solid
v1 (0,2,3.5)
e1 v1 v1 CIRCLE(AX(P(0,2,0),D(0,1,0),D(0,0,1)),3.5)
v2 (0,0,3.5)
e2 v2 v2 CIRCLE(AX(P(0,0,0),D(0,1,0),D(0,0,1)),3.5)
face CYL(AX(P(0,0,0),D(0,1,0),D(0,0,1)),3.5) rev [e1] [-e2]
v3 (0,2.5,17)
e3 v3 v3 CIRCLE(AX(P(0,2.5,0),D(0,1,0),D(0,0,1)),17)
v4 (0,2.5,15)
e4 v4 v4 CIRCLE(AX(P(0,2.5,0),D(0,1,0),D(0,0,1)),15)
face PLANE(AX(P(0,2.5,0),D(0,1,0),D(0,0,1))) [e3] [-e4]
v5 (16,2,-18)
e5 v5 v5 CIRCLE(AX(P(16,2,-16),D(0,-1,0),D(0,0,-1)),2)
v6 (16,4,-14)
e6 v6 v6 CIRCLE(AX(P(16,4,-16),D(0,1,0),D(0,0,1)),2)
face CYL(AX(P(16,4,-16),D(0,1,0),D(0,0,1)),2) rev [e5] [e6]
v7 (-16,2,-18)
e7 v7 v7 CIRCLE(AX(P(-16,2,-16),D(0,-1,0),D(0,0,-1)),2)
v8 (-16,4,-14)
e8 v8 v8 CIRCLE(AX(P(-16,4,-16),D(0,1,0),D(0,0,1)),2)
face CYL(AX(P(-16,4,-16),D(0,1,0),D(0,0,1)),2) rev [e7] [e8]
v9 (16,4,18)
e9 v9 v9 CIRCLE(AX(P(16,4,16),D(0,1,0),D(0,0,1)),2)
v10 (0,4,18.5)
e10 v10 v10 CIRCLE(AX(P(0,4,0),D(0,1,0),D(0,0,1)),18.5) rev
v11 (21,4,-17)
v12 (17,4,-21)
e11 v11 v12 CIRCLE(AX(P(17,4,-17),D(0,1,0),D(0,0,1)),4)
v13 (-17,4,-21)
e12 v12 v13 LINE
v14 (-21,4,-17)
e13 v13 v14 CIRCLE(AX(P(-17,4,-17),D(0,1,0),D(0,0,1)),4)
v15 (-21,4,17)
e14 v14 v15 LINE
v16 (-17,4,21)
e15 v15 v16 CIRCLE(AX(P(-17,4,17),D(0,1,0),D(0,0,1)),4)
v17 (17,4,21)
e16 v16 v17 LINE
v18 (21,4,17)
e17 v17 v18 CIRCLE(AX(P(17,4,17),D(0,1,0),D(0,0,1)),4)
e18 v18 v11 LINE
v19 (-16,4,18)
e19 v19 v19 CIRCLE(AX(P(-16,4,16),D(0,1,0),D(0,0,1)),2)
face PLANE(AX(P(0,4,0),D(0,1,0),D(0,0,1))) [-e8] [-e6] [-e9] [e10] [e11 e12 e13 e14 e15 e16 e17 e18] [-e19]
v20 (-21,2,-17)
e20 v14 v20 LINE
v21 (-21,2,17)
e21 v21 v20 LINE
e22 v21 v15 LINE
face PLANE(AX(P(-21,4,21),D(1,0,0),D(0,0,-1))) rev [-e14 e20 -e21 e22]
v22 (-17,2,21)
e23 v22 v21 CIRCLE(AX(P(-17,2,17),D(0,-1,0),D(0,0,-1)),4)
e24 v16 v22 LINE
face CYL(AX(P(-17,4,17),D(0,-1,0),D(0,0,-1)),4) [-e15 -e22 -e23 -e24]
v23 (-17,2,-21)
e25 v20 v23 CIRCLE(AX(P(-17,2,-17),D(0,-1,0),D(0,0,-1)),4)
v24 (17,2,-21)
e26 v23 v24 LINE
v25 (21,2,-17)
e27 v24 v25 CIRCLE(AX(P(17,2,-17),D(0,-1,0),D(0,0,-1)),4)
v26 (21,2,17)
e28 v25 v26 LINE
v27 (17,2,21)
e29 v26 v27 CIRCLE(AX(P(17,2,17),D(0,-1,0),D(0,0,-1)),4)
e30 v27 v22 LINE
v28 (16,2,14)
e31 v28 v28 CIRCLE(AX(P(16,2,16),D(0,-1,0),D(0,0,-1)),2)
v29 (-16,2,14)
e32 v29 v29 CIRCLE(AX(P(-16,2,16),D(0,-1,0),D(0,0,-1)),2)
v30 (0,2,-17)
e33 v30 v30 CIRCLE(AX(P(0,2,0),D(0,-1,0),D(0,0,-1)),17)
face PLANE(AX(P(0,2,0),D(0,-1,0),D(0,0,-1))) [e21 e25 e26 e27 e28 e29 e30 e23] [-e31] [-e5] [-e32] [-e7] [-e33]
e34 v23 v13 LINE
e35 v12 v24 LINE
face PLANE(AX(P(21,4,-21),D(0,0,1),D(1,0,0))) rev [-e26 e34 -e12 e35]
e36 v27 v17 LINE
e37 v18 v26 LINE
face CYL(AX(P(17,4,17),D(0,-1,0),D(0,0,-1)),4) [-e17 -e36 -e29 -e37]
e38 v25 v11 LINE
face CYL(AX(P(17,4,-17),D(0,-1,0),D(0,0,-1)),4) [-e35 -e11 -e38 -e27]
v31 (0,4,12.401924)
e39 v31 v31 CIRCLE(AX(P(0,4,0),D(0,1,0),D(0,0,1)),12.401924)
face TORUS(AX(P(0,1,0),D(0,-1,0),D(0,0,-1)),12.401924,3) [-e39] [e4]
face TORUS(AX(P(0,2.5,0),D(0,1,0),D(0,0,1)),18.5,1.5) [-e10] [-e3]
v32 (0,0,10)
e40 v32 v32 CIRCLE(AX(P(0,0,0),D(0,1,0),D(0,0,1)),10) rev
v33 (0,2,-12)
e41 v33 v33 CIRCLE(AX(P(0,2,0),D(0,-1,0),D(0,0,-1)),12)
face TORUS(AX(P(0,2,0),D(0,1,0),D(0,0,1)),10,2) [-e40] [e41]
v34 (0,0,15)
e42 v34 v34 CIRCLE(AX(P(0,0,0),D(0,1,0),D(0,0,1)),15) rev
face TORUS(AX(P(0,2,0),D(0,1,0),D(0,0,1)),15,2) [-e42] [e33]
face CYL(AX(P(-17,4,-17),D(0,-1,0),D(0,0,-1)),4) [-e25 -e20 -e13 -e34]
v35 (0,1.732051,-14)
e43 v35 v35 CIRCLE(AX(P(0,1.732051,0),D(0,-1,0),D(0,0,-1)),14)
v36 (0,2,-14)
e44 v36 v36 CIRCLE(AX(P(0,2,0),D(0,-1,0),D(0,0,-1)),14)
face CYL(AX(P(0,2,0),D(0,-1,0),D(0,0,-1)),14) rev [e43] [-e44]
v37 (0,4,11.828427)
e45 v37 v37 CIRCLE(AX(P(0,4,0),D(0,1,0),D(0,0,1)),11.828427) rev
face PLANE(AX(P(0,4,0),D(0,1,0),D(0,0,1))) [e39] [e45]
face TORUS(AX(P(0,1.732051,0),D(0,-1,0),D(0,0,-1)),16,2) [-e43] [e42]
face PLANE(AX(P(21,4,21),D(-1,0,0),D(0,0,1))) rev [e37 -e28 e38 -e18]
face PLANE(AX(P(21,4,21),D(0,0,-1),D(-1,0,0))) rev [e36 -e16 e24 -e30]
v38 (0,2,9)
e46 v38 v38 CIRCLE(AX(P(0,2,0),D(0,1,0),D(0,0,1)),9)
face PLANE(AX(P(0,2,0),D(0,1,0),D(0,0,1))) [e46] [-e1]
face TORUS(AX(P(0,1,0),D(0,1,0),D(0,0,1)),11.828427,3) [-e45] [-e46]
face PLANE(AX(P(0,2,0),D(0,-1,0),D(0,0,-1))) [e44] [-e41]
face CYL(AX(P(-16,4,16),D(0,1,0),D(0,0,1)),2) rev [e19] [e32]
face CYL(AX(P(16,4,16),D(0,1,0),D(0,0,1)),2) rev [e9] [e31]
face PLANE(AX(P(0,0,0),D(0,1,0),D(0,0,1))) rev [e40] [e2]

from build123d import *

# Parameters (mm, degrees)
ESBO_O9_W                  = 42
ESBO_O9_H                  = 42
RESSALTO_EXTRUS_O1_DEPTH   = 4
ESBO_O10_R                 = 17
ESBO_O10_R_2               = 15
CORTE_EXTRUS_O1_DEPTH      = 1.5
FILETE1_R                  = 1.5
CORTE_EXTRUS_O2_START      = -2
ESBO_O11_W                 = 42
ESBO_O11_H                 = 42
ESBO_O11_R                 = 17
CORTE_EXTRUS_O2_DEPTH      = 2
FILETE2_R                  = 2
ESBO_O12_R                 = 9
CORTE_EXTRUS_O3_DEPTH      = 2
FILETE3_R                  = 3
ESBO_O13_R                 = 14
ESBO_O13_R_2               = 12
CORTE_EXTRUS_O4_DEPTH      = 2
FILETE4_R                  = 2
ESBO_O14_R                 = 3.5
CORTE_EXTRUS_O5_DEPTH      = 30.765752132
FURO_DE_DI_METRO_5_0_5_1_D = 4
FILETE5_R                  = 4


# Some blends are built 0.0001 mm under size
with BuildPart() as part:
    # Esboço9 → Ressalto-extrusão1 (new body)
    with BuildSketch(Plane(origin=(0, 0, 0), x_dir=(1, 0, 0), z_dir=(0, 1, 0))):
        Rectangle(ESBO_O9_W, ESBO_O9_H)
    extrude(amount=RESSALTO_EXTRUS_O1_DEPTH)

    # Esboço10 → Corte-extrusão1 (cut)
    with BuildSketch(Plane(origin=(0, 4, 0), x_dir=(1, 0, 0), z_dir=(0, 1, 0))):
        with Locations(Location((0, 0, 0), (0, 0, 270))):
            Circle(ESBO_O10_R)
        with Locations(Location((0, 0, 0), (0, 0, 270))):
            Circle(ESBO_O10_R_2, mode=Mode.SUBTRACT)
    extrude(amount=-CORTE_EXTRUS_O1_DEPTH, mode=Mode.SUBTRACT)

    # Filete1
    filete1_edges = [part.edges().sort_by_distance(p)[0] for p in [
        (0, 4, -17),
    ]]
    fillet(filete1_edges, radius=FILETE1_R - 0.0001)  # a hair under: the kernel refuses the full size

    # Esboço11 → Corte-extrusão2 (cut)
    with BuildSketch(Plane.XZ.offset(CORTE_EXTRUS_O2_START)):
        Rectangle(ESBO_O11_W, ESBO_O11_H)
        with Locations(Location((0, 0, 0), (0, 0, 270))):
            Circle(ESBO_O11_R, mode=Mode.SUBTRACT)
    extrude(amount=CORTE_EXTRUS_O2_DEPTH, mode=Mode.SUBTRACT)

    # Filete2
    filete2_edges = [part.edges().sort_by_distance(p)[0] for p in [
        (0, 0, 17),
    ]]
    fillet(filete2_edges, radius=FILETE2_R - 0.0001)  # a hair under: the kernel refuses the full size

    # Esboço12 → Corte-extrusão3 (cut)
    with BuildSketch(Plane(origin=(0, 4, 0), x_dir=(1, 0, 0), z_dir=(0, 1, 0))):
        with Locations(Location((0, 0, 0), (0, 0, 270))):
            Circle(ESBO_O12_R)
    extrude(amount=-CORTE_EXTRUS_O3_DEPTH, mode=Mode.SUBTRACT)

    # Filete3
    # the kernel refuses this fillet: 3 mm, written as the material it takes off along each edge
    with BuildSketch(Plane(origin=(0, 4, 0), x_dir=(0, 0, 1), z_dir=(-1, 0, 0))) as filete3_piece_1:
        with BuildLine():
            CenterArc((12.401923789, -3), FILETE3_R, 30, 60)
            Line((12.401923789, 0), (12.401923789, 0.06))
            Line((12.401923789, 0.06), (15, 0.06))
            Line((15, 0.06), (15.06, 0))
            ThreePointArc((15.06, 0), (15.06, -0.75), (15.051961524, -1.47))
            Line((15.051961524, -1.47), (15, -1.5))
        make_face()
    revolve(axis=Axis((0, 4, 0), (0, 1, 0)), mode=Mode.SUBTRACT)
    with BuildSketch(Plane(origin=(0, 4, 0), x_dir=(0, 0, 1), z_dir=(-1, 0, 0))) as filete3_piece_2:
        with BuildLine():
            CenterArc((11.828427125, -3), FILETE3_R, 90, 70.528779366)
            Line((9, -2), (8.943431458, -1.98))
            ThreePointArc((8.943431458, -1.98), (8.94, -1), (8.94, 0))
            Line((8.94, 0), (9, 0.06))
            Line((9, 0.06), (11.828427125, 0.06))
            Line((11.828427125, 0.06), (11.828427125, 0))
        make_face()
    revolve(axis=Axis((0, 4, 0), (0, 1, 0)), mode=Mode.SUBTRACT)

    # Esboço13 → Corte-extrusão4 (cut)
    with BuildSketch(Plane.XZ):
        with Locations(Location((0, 0, 0), (0, 0, 270))):
            Circle(ESBO_O13_R)
        with Locations(Location((0, 0, 0), (0, 0, 270))):
            Circle(ESBO_O13_R_2, mode=Mode.SUBTRACT)
    extrude(amount=-CORTE_EXTRUS_O4_DEPTH, mode=Mode.SUBTRACT)

    # Filete4
    # the kernel refuses this fillet: 2 mm, written as the material it takes off along each edge
    with BuildSketch(Plane(origin=(0, 0, 0), x_dir=(0, 0, -1), z_dir=(-1, 0, 0))) as filete4_piece_1:
        with BuildLine():
            CenterArc((16, -1.732108539), FILETE4_R, 119.996692082, 60.003307918)
            Line((14, -1.732108539), (13.96, -1.732108539))
            Line((13.96, -1.732108539), (13.96, 0))
            Line((13.96, 0), (14, 0.04))
            ThreePointArc((14, 0.04), (14.50005, 0.04), (14.980102, 0.034642171))
            Line((14.980102, 0.034642171), (15.0001, 0))
        make_face()
    revolve(axis=Axis((0, 0, 0), (0, -1, 0)), mode=Mode.SUBTRACT)
    with BuildSketch(Plane(origin=(0, 0, 0), x_dir=(0, 0, -1), z_dir=(-1, 0, 0))) as filete4_piece_2:
        with BuildLine():
            CenterArc((12 - FILETE4_R, -FILETE4_R), FILETE4_R, 0, 90)
            Line((12 - FILETE4_R, 0), (12 - FILETE4_R, FILETE4_R * 0.02))
            Line((12 - FILETE4_R, FILETE4_R * 0.02), (12 + FILETE4_R * 0.02, FILETE4_R * 0.02))
            Line((12 + FILETE4_R * 0.02, FILETE4_R * 0.02), (12 + FILETE4_R * 0.02, -FILETE4_R))
            Line((12 + FILETE4_R * 0.02, -FILETE4_R), (12, -FILETE4_R))
        make_face()
    revolve(axis=Axis((0, 0, 0), (0, -1, 0)), mode=Mode.SUBTRACT)

    # Esboço14 → Corte-extrusão5 (cut, through all)
    with BuildSketch(Plane(origin=(0, 2, 0), x_dir=(1, 0, 0), z_dir=(0, 1, 0))):
        with Locations(Location((0, 0, 0), (0, 0, 270))):
            Circle(ESBO_O14_R)
    extrude(amount=-CORTE_EXTRUS_O5_DEPTH, mode=Mode.SUBTRACT)

    # Furo de diâmetro Ø5.0 (5)1 (through all)
    with Locations(Plane(origin=(0, 4, 0), x_dir=(1, 0, 0), z_dir=(0, 1, 0))):
        with Locations((-16, -16), (-16, 16), (16, 16), (16, -16)):
            Hole(FURO_DE_DI_METRO_5_0_5_1_D / 2)

    # Filete5
    filete5_edges = [part.edges().sort_by_distance(p)[0] for p in [
        (-21, 3, -21),
        (21, 3, -21),
        (21, 3, 21),
        (-21, 3, 21),
    ]]
    fillet(filete5_edges, radius=FILETE5_R)


solid = part.part
